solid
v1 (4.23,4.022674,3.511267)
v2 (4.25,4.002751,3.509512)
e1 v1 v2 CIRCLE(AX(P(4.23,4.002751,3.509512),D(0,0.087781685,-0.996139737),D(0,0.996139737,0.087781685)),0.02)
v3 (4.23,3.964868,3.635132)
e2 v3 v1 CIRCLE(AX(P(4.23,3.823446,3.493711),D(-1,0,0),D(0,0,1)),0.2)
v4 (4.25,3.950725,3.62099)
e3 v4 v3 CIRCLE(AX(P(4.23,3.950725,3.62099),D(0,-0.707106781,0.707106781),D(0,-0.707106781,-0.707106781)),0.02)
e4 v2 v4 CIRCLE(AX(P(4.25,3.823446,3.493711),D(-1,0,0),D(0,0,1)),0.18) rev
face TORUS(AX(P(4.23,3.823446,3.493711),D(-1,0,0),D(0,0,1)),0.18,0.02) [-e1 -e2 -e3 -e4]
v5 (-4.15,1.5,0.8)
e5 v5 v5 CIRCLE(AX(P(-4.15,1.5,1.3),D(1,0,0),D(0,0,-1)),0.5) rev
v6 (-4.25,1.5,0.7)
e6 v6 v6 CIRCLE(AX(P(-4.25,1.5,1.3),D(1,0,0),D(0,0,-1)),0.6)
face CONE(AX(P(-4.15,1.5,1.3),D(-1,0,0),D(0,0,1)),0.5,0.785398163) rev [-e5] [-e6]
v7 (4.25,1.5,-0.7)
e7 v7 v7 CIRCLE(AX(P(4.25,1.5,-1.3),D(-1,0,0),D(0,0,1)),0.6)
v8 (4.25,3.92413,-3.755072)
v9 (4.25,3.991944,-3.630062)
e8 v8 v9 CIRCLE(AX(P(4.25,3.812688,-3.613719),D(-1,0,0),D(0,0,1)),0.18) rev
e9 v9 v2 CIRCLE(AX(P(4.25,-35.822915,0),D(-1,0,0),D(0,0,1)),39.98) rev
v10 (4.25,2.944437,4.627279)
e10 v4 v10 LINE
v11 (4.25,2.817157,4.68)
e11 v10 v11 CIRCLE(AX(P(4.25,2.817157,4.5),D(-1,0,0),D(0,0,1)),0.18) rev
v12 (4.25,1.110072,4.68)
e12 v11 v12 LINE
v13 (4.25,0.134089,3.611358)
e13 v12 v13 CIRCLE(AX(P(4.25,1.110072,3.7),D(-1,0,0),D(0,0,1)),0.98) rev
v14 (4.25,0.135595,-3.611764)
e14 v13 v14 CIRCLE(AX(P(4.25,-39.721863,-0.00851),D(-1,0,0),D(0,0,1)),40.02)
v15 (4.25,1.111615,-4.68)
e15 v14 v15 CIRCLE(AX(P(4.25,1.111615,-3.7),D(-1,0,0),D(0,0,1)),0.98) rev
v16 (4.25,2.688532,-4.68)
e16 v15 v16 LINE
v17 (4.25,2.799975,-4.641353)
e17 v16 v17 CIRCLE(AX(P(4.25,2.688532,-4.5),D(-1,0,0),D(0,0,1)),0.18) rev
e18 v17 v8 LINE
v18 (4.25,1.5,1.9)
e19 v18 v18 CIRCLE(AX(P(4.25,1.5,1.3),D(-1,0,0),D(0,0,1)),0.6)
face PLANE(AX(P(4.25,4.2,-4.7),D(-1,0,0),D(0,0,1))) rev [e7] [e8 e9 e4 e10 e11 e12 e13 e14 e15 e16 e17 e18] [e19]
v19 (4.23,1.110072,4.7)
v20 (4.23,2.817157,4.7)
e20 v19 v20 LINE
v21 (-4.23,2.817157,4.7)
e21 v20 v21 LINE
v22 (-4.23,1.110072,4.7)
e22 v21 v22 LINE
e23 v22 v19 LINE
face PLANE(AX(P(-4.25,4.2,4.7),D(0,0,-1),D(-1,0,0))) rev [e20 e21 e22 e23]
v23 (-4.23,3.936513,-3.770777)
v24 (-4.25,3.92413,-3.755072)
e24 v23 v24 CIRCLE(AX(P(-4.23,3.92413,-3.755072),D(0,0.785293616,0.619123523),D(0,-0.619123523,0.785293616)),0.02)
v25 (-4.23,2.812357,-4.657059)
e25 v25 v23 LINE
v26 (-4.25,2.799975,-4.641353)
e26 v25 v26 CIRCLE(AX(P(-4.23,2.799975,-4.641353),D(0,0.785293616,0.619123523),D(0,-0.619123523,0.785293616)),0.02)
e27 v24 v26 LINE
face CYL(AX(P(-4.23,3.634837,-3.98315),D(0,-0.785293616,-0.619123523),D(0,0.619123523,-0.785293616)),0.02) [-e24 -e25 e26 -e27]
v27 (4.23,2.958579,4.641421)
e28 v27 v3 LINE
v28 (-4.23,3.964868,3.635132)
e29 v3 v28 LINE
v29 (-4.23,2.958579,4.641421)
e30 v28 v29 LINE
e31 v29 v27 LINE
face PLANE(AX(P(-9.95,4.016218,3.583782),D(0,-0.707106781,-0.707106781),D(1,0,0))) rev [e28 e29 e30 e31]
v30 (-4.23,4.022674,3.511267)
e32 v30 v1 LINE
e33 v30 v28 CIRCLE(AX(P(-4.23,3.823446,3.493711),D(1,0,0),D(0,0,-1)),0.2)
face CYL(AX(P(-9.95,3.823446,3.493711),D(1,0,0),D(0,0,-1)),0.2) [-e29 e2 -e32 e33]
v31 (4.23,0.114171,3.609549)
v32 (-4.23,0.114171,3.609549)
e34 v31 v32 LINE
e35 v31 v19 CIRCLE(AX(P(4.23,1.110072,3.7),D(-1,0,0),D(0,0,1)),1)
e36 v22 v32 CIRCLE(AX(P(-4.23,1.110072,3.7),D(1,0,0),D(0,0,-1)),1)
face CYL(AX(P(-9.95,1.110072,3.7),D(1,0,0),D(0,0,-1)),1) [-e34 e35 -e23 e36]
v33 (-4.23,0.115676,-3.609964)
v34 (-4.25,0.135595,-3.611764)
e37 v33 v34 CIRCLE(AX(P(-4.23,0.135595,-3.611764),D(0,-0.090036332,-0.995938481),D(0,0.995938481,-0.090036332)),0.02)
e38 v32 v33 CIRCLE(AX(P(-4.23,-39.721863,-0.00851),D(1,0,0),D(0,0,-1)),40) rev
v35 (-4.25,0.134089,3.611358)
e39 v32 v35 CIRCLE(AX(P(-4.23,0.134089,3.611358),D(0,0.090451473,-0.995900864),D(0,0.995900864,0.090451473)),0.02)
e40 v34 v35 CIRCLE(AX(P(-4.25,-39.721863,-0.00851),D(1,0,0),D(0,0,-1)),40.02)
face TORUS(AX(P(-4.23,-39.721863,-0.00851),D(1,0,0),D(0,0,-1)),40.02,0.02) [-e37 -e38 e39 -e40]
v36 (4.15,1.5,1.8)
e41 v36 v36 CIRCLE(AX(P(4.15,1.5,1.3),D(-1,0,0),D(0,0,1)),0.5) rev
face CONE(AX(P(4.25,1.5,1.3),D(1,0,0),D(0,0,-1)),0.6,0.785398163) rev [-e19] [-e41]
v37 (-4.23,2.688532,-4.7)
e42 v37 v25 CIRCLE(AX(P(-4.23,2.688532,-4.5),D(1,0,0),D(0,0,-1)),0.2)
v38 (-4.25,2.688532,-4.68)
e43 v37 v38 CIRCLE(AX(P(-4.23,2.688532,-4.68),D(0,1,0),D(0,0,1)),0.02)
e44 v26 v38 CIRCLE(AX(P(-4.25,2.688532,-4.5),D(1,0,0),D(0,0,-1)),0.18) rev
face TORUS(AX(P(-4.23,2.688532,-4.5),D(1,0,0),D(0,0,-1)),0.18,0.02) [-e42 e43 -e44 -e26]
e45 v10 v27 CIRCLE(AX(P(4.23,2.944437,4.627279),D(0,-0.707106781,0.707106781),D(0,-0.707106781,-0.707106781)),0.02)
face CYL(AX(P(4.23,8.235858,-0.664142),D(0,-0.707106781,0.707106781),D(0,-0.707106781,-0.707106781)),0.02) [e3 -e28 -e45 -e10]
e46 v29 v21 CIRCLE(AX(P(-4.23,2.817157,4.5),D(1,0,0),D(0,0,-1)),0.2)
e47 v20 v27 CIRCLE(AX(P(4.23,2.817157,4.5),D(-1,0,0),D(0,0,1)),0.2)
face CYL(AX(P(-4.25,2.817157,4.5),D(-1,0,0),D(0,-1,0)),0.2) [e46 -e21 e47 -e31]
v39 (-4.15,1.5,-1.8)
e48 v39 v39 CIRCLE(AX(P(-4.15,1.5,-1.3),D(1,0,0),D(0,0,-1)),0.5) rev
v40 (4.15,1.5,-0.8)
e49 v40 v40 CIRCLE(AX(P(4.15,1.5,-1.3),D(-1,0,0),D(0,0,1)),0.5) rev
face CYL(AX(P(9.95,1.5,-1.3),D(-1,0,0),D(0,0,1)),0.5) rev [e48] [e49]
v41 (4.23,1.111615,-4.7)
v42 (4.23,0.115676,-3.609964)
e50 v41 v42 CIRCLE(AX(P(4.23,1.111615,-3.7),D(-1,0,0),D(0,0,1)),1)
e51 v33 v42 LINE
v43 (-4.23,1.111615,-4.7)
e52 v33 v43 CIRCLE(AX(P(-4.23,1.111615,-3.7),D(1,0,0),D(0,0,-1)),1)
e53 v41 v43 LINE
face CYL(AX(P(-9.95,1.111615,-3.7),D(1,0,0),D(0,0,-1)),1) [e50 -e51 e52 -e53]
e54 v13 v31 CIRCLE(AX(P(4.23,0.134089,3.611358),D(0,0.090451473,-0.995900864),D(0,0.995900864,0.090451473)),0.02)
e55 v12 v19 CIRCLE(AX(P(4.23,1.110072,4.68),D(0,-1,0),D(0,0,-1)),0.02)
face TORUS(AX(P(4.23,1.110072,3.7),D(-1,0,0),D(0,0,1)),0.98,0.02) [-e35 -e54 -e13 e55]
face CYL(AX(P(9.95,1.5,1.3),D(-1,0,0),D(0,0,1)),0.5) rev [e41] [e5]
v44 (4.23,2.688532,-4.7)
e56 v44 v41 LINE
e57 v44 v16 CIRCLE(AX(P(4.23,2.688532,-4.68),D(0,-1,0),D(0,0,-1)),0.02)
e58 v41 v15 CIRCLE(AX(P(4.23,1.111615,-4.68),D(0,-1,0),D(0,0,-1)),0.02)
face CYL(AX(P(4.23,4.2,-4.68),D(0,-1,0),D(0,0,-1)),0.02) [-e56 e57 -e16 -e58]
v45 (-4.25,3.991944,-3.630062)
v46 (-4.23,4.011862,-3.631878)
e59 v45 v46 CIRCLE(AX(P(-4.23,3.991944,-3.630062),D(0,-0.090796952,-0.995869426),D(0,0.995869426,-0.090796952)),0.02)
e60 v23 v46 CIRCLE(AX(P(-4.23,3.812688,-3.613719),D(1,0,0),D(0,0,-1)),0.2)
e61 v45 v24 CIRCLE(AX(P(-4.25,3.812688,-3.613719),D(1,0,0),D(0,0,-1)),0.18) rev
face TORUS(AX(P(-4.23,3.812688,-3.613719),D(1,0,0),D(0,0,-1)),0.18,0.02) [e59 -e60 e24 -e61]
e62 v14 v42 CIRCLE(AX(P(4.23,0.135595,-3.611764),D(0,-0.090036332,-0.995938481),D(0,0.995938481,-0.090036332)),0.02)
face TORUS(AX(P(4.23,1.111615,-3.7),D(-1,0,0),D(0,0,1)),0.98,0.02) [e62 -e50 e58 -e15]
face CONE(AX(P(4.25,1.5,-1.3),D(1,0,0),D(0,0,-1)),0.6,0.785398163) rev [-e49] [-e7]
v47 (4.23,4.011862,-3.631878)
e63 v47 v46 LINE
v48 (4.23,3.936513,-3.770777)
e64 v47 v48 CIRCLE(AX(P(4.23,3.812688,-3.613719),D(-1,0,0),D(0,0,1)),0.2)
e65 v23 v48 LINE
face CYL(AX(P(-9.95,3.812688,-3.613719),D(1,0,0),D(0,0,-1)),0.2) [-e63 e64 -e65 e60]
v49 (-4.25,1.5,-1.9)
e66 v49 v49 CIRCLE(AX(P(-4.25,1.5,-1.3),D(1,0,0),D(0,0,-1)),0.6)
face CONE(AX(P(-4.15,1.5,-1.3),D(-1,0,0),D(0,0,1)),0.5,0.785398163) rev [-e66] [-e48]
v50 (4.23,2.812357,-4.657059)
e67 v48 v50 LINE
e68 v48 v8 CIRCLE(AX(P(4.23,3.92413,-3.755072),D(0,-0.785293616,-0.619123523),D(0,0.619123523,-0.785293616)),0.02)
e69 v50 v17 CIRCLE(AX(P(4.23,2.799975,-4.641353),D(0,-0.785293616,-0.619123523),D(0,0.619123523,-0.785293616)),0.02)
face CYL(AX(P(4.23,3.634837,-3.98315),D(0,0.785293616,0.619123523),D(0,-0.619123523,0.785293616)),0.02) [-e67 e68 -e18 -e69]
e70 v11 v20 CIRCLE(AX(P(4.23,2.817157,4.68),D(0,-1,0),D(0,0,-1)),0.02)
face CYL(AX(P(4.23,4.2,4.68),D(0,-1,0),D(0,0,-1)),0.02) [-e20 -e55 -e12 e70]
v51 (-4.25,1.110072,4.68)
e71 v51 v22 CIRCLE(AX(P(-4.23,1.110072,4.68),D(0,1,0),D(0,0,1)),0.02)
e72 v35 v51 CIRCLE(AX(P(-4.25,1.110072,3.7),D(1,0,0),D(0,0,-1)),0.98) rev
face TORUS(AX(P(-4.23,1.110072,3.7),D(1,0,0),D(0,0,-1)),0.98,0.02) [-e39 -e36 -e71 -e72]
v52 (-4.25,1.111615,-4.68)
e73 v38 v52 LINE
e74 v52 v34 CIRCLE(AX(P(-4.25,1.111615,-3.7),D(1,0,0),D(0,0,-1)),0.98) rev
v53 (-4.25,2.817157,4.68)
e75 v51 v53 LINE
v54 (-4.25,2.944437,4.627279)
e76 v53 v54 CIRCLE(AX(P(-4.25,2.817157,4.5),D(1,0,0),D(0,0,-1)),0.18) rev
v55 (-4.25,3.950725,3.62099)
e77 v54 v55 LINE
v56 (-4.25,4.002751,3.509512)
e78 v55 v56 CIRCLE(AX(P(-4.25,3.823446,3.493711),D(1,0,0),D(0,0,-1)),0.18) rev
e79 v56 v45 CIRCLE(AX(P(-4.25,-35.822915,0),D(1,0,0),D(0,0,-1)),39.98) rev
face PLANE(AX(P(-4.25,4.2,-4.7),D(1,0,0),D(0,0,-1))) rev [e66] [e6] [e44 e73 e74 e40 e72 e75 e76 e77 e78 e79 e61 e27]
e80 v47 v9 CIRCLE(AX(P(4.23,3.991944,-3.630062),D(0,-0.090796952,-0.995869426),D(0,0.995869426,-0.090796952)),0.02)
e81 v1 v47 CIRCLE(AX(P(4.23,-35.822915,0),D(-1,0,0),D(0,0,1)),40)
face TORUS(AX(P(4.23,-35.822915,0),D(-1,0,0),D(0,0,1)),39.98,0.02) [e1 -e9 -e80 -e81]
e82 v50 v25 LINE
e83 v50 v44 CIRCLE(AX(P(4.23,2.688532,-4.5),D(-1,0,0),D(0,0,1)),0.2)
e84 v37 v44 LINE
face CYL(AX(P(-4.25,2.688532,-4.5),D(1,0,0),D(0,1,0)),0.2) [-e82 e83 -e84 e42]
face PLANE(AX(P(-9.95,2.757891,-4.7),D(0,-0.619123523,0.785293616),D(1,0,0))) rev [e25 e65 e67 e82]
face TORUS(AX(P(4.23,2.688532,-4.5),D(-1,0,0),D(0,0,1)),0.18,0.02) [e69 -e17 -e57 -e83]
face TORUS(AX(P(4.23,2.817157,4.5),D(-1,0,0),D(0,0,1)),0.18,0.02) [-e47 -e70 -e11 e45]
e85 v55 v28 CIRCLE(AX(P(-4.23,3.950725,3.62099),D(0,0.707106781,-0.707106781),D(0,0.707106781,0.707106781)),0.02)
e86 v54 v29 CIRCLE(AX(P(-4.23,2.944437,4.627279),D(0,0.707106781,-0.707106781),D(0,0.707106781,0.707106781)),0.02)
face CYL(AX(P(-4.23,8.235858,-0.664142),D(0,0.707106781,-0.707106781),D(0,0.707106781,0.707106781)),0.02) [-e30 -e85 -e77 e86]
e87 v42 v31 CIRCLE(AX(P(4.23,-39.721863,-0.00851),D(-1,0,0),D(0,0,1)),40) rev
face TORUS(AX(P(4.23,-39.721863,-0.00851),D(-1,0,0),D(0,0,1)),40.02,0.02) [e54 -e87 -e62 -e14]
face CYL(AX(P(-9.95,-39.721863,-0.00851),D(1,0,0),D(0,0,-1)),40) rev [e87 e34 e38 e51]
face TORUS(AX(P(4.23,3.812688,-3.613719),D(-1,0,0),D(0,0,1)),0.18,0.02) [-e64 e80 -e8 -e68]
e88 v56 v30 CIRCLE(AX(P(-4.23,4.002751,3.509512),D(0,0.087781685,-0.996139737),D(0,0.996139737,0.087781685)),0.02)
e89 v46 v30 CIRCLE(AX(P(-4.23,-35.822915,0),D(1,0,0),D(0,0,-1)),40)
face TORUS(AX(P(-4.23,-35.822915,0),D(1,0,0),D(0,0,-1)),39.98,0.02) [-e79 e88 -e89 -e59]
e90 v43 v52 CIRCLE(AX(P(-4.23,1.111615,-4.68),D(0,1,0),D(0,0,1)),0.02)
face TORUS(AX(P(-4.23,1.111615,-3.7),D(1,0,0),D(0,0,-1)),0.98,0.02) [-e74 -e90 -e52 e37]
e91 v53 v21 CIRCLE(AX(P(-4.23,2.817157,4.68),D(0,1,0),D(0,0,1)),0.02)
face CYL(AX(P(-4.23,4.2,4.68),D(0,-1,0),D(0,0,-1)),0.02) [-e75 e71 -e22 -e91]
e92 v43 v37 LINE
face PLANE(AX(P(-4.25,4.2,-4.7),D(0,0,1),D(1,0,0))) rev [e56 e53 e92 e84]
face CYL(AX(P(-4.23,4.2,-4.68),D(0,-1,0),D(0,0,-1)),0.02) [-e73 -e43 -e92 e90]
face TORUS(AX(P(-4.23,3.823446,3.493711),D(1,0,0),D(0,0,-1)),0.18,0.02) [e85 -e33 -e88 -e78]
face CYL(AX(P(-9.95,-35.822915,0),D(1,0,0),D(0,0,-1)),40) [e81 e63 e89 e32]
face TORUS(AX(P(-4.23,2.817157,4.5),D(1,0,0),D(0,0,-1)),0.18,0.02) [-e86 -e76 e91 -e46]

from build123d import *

# Parameters (mm, degrees)
SKETCH1_W           = 8.5
SKETCH1_H           = 9.4
BOSS_EXTRUDE1_DEPTH = 4.2
CUT_EXTRUDE1_DEPTH  = 14.2
CHAMFER1_SIZE       = 1.142109378
CHAMFER1_SIZE_2     = 1
FILLET1_R           = 1
FILLET2_R           = 0.2
FILLET3_R           = 0.02
SKETCH3_R           = 0.5
CUT_EXTRUDE2_DEPTH  = 14.2
CHAMFER2_SIZE       = 0.1


with BuildPart() as part:
    # Sketch1 → Boss-Extrude1 (new body)
    with BuildSketch(Plane(origin=(0, 0, 0), x_dir=(1, 0, 0), z_dir=(0, 1, 0))):
        Rectangle(SKETCH1_W, SKETCH1_H)
    extrude(amount=BOSS_EXTRUDE1_DEPTH)

    # Sketch2 → Cut-Extrude1 (cut)
    with BuildSketch(Plane(origin=(4.25, 0, 0), x_dir=(0, 0, -1), z_dir=(1, 0, 0))):
        with BuildLine():
            Line((-4.7, 3.9), (-5.253535024, 5.241651662))
            Line((-5.253535024, 5.241651662), (3.889156526, 7.141243929))
            Line((3.889156526, 7.141243929), (5.679183493, 5.077233243))
            Line((5.679183493, 5.077233243), (4.7, 3.9))
            ThreePointArc((4.7, 3.9), (0, 4.177084699), (-4.7, 3.9))
        make_face()
        with BuildLine():
            Line((4.717394395, 0), (0, -2.904825783))
            Line((0, -2.904825783), (-4.70037365, 0))
            ThreePointArc((-4.70037365, 0), (0.008510373, 0.278136861), (4.717394395, 0))
        make_face()
    extrude(amount=-CUT_EXTRUDE1_DEPTH, mode=Mode.SUBTRACT)

    # Chamfer1
    # the kernel refuses this chamfer: 1.142109378, 1 mm, written as the material it takes off along each edge
    with BuildSketch(Plane(origin=(7.19581135, 3.9, -4.7), x_dir=(0, -1, 0), z_dir=(-1, 0, 0))) as chamfer1_piece_1:
        with BuildLine():
            Line((CHAMFER1_SIZE, 0), (-0.103952397, 0.982391987))
            ThreePointArc((-0.103952397, 0.982391987), (-0.056683865, 0.506732753), (0, 0))
            Line((0, 0), (CHAMFER1_SIZE, 0))
        make_face()
    extrude(amount=14.391622699, mode=Mode.SUBTRACT)
    with BuildSketch(Plane(origin=(7.145211131, 3.9, 4.7), x_dir=(0, 0.10355747110922714, -0.994623471559696), z_dir=(-1, 0, 0))) as chamfer1_piece_2:
        with BuildLine():
            Line((1.122251325, 0), (-CHAMFER1_SIZE_2 * 0.103557471109, CHAMFER1_SIZE_2 * 0.99462347156))
            Line((-CHAMFER1_SIZE_2 * 0.103557471109, CHAMFER1_SIZE_2 * 0.99462347156), (0, 0))
            ThreePointArc((0, 0), (0.578858696, -0.003932038), (1.122251325, 0))
        make_face()
    extrude(amount=14.290422262, mode=Mode.SUBTRACT)

    # Fillet1
    fillet1_edges = [part.edges().sort_by_distance(p)[0] for p in [
        (0, 0.002058181, -4.7),
        (0, 4.4293e-05, 4.7),
    ]]
    fillet(fillet1_edges, radius=FILLET1_R)

    # Fillet2
    fillet2_edges = [part.edges().sort_by_distance(p)[0] for p in [
        (0, 2.757890622, -4.7),
        (0, 4.016217509, 3.583782491),
        (0, 4.003952397, -3.717608013),
        (0, 2.9, 4.7),
    ]]
    fillet(fillet2_edges, radius=FILLET2_R)

    # Fillet3
    fillet3_edges = [part.edges().sort_by_distance(p)[0] for p in [
        (4.25, 0.278135992, -0.000173553),
        (4.25, 0.373361144, -4.374523412),
        (4.25, 0.371678264, 4.374369531),
        (-4.25, 0.278135992, -0.000173553),
        (-4.25, 0.373361144, -4.374523412),
        (-4.25, 0.371678264, 4.374369531),
        (4.25, 1.900073524, -4.7),
        (-4.25, 1.900073524, -4.7),
        (4.25, 1.963614788, 4.7),
        (4.25, 3.374434854, -4.21391807),
        (4.25, 4.177038875, -0.06054719),
        (4.25, 3.461723118, 4.138276882),
        (4.25, 2.893693974, 4.684775907),
        (4.25, 4.004681229, 3.578291648),
        (4.25, 3.988486823, -3.709084943),
        (4.25, 2.754062042, -4.688959975),
        (-4.25, 3.374434854, -4.21391807),
        (-4.25, 1.963614788, 4.7),
        (-4.25, 3.461723118, 4.138276882),
        (-4.25, 4.177038875, -0.06054719),
        (-4.25, 2.893693974, 4.684775907),
        (-4.25, 4.004681229, 3.578291648),
        (-4.25, 3.988486823, -3.709084943),
        (-4.25, 2.754062042, -4.688959975),
    ]]
    fillet(fillet3_edges, radius=FILLET3_R)

    # Sketch3 → Cut-Extrude2 (cut)
    with BuildSketch(Plane.ZY.offset(4.25)):
        with Locations((-1.3, 1.5)):
            Circle(SKETCH3_R)
        with Locations((1.3, 1.5)):
            Circle(SKETCH3_R)
    extrude(amount=-CUT_EXTRUDE2_DEPTH, mode=Mode.SUBTRACT)

    # Chamfer2
    chamfer2_edges = [part.edges().sort_by_distance(p)[0] for p in [
        (4.25, 1.5, -1.8),
        (-4.25, 1.5, -1.8),
        (4.25, 1.5, 0.8),
        (-4.25, 1.5, 0.8),
    ]]
    chamfer(chamfer2_edges, length=CHAMFER2_SIZE)


solid = part.part
